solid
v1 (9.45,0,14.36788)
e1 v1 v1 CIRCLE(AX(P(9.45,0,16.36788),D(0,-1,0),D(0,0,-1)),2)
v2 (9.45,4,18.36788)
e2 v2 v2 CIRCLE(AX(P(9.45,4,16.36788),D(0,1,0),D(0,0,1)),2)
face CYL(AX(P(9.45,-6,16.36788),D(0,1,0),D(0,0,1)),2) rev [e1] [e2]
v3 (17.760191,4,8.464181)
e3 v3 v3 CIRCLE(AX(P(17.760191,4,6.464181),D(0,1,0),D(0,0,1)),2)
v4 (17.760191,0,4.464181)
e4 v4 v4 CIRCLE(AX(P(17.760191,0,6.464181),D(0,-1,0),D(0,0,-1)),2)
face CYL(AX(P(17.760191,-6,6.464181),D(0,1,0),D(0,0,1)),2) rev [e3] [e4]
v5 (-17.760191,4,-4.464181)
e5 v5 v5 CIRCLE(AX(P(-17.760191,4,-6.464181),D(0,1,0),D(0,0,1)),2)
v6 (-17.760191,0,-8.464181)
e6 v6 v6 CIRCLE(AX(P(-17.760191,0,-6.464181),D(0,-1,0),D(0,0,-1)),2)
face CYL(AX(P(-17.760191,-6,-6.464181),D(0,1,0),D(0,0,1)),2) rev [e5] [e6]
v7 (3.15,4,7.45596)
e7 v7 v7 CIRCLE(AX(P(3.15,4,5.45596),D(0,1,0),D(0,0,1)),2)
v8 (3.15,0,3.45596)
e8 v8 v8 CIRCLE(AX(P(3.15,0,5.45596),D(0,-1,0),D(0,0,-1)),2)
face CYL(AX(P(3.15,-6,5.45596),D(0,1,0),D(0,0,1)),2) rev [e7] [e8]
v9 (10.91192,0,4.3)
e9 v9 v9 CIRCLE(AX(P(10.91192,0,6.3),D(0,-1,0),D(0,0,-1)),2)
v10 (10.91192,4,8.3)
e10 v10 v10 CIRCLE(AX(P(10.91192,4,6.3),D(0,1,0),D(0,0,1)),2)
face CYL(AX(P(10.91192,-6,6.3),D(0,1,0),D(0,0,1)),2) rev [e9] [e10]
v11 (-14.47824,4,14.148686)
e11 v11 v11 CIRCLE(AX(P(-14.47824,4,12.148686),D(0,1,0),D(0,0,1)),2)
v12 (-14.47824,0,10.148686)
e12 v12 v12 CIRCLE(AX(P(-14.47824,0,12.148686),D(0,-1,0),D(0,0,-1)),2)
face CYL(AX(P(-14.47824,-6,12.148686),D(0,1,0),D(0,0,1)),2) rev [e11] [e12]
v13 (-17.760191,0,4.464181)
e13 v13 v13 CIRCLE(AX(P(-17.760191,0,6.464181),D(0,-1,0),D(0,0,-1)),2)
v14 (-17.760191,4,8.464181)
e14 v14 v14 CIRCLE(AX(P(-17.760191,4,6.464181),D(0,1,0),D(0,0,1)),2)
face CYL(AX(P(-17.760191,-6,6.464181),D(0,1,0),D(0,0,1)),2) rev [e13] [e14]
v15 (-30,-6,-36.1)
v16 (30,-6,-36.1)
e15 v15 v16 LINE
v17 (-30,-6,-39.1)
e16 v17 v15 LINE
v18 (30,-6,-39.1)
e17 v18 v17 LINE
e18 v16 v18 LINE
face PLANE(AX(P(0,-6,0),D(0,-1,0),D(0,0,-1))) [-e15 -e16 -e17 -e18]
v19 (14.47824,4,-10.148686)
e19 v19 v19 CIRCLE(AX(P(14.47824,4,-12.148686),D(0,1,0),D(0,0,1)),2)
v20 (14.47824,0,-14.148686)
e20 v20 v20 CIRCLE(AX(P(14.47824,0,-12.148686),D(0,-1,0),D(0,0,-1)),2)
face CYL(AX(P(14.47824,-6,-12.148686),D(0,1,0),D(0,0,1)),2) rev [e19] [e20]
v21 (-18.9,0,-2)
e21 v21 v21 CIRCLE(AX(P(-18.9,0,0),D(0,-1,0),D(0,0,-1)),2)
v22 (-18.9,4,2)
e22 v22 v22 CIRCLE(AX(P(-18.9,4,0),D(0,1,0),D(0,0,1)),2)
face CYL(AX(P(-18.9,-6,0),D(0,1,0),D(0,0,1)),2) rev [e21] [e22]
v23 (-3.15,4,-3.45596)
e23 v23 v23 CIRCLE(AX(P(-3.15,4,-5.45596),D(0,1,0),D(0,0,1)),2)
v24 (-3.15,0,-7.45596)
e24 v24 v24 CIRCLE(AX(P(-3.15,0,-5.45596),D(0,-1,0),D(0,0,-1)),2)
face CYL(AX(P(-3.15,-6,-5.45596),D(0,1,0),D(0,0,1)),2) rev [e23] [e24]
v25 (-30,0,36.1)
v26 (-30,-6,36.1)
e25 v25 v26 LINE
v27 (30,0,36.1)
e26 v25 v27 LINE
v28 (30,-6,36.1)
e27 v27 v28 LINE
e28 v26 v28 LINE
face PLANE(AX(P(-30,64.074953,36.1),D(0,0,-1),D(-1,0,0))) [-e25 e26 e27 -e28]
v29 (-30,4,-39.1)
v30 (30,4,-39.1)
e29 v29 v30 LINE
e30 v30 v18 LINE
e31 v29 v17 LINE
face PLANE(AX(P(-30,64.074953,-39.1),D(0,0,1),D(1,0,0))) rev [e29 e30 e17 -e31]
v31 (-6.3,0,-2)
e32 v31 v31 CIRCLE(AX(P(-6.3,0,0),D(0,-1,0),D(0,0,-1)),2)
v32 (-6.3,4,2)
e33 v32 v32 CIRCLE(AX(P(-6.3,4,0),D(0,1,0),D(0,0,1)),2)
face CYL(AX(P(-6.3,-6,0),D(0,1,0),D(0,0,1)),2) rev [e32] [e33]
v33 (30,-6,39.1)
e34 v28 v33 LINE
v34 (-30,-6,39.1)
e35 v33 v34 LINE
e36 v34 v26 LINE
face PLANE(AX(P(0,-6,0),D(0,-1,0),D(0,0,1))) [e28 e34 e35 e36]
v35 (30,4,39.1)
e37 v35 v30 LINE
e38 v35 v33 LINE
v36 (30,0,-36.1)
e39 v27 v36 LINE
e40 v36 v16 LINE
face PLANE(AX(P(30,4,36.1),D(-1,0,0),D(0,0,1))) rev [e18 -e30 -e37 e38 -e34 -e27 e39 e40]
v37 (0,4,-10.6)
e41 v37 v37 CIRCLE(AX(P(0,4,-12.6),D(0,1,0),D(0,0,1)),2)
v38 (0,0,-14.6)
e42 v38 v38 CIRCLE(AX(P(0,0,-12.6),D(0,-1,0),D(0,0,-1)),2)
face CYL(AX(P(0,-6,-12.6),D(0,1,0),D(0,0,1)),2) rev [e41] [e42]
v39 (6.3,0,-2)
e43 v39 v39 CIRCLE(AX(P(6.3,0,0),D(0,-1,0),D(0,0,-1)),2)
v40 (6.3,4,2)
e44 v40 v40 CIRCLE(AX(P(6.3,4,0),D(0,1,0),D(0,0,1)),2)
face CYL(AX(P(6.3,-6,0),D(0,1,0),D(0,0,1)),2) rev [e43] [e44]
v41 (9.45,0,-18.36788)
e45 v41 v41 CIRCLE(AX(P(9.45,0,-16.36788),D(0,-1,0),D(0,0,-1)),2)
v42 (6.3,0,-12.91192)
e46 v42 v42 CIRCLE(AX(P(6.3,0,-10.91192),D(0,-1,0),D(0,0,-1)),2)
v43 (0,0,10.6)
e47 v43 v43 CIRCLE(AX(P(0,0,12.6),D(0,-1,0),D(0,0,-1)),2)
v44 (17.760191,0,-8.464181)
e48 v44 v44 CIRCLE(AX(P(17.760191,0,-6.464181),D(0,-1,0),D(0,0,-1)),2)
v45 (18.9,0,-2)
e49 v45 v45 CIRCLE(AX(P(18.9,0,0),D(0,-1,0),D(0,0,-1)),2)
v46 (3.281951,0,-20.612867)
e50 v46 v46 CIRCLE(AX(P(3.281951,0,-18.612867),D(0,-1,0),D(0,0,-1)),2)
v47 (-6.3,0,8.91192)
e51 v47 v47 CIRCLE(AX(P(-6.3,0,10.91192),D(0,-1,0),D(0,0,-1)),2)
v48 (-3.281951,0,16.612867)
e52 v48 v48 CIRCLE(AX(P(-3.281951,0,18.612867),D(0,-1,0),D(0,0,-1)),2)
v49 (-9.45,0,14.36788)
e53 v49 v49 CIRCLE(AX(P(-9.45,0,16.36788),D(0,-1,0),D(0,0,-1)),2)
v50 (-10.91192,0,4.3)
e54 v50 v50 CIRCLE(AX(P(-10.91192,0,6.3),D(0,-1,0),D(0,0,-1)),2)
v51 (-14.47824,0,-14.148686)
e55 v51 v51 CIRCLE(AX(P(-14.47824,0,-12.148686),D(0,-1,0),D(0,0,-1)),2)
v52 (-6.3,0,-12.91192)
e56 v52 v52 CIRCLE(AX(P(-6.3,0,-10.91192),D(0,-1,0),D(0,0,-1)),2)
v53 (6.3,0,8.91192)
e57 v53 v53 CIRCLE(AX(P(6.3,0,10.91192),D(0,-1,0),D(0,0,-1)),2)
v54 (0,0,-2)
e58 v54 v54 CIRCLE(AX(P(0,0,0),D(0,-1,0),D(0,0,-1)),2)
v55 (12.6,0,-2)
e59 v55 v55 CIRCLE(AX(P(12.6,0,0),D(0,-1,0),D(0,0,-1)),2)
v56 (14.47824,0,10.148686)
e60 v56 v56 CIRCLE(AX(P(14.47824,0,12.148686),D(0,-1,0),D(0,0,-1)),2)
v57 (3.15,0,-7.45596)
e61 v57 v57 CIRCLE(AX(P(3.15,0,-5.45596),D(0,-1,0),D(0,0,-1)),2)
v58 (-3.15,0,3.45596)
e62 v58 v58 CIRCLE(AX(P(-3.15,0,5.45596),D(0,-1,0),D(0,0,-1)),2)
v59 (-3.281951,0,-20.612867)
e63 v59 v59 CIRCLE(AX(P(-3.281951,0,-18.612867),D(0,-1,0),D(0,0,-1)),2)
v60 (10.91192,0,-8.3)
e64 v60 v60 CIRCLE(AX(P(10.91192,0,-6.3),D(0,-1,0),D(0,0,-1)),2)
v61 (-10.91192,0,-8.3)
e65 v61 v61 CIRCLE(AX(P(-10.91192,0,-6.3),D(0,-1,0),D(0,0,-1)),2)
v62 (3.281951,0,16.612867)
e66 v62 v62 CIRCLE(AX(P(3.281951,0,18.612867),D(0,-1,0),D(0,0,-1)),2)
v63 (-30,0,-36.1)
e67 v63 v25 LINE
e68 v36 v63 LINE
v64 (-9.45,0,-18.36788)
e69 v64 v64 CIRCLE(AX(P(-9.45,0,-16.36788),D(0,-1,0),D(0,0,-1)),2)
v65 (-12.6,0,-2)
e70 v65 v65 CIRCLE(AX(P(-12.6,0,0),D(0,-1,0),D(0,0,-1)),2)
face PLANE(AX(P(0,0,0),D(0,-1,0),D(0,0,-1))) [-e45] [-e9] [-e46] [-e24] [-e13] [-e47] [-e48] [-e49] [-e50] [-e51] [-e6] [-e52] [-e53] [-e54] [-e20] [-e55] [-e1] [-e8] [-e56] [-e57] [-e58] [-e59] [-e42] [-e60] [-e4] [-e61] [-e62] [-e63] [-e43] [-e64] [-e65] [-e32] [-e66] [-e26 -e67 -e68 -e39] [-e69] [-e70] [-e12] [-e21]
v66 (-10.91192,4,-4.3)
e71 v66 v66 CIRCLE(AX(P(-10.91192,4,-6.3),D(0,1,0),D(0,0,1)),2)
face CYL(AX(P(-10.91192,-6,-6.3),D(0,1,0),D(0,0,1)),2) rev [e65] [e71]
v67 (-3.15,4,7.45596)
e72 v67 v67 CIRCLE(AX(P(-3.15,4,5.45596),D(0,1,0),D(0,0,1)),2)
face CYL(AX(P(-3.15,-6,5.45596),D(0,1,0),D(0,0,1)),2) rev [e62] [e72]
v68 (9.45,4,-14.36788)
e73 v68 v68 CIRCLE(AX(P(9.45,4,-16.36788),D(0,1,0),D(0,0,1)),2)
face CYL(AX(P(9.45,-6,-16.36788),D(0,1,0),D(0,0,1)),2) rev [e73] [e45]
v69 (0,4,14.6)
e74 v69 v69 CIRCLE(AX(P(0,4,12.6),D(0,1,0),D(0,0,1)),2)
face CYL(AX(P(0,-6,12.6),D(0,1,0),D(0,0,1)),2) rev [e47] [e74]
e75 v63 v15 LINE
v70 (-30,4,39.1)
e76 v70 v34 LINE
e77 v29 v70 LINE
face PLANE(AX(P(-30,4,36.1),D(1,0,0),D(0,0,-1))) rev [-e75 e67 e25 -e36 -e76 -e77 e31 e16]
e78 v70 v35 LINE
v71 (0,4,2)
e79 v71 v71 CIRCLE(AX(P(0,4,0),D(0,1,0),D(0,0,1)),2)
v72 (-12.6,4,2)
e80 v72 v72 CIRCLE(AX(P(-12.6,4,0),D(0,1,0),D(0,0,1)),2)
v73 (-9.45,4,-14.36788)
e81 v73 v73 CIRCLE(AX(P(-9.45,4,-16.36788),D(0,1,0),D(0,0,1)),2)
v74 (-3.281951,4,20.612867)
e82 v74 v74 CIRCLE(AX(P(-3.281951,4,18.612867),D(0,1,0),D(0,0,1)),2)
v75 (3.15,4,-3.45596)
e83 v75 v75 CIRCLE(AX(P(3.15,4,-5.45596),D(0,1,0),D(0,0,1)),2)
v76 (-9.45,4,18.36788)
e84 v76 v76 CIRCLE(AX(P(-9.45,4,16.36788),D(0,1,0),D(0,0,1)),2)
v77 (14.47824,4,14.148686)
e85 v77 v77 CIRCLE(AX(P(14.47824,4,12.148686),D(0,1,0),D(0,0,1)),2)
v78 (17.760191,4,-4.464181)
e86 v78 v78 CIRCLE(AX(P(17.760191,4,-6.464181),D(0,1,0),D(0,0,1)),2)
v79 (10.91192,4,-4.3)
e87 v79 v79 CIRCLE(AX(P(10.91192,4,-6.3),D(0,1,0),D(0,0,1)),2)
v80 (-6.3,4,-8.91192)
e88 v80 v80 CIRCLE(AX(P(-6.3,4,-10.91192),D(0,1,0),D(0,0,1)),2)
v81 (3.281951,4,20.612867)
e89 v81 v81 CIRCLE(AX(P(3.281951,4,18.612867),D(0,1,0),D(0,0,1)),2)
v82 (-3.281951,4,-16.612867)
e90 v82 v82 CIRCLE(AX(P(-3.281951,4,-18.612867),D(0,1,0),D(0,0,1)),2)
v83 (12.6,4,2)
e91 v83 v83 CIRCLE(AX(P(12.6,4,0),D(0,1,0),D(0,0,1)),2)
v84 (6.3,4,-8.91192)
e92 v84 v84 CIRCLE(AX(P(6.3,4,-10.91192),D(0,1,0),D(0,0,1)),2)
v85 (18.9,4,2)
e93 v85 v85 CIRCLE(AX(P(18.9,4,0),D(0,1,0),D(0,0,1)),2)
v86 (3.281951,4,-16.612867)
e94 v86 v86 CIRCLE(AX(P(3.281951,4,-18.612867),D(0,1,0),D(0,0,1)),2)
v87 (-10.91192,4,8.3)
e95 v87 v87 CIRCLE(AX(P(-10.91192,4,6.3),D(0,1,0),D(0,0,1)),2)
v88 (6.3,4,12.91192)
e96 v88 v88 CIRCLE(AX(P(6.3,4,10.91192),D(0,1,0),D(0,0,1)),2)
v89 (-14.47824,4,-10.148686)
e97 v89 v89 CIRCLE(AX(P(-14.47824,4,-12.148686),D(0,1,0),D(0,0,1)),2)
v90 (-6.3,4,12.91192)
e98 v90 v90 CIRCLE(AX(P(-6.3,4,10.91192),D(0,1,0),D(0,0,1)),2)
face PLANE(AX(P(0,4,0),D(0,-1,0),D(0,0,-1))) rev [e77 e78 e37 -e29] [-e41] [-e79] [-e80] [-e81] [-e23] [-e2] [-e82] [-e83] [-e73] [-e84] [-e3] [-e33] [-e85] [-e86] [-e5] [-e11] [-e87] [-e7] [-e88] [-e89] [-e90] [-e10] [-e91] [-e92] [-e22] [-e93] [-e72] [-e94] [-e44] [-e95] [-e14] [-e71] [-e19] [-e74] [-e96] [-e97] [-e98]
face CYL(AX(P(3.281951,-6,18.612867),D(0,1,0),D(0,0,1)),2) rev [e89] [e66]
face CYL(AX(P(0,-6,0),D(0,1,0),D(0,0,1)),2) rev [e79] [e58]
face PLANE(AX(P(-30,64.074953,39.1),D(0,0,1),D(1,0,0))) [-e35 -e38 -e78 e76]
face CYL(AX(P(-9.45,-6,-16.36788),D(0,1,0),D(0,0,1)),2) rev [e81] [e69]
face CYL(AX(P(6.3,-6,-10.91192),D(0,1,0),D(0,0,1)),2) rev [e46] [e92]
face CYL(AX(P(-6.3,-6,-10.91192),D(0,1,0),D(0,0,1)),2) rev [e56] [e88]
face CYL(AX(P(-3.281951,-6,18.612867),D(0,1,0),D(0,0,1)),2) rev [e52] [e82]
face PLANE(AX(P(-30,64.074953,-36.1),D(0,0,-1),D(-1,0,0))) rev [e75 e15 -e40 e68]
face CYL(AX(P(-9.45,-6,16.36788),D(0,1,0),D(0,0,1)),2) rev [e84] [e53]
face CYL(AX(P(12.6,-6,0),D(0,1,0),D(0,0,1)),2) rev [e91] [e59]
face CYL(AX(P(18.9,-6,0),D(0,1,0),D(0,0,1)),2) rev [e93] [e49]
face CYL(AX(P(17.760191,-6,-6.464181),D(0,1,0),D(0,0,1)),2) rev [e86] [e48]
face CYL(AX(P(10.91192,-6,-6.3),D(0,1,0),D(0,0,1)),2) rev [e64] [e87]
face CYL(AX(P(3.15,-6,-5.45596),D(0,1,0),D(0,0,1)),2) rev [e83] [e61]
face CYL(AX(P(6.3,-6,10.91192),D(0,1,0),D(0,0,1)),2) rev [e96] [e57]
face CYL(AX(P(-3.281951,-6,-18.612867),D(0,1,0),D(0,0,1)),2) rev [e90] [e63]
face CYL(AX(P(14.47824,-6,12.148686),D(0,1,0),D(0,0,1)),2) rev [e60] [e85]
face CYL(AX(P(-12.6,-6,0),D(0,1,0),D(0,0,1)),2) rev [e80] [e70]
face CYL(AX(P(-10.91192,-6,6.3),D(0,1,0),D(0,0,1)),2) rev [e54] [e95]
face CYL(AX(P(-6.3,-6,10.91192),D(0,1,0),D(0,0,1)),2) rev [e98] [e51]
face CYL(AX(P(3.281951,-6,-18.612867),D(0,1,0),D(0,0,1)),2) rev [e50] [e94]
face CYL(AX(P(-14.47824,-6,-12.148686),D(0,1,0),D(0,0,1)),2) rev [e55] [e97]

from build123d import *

# Parameters (mm, degrees)
SKIZZE1_W                       = 60
SKIZZE1_H                       = 72.2
AUFSATZ_LINEAR_AUSTRAGEN1_DEPTH = 4
AUFSATZ_LINEAR_START            = -6
SKIZZE2_W                       = 60
SKIZZE2_H                       = 3
AUFSATZ_LINEAR_AUSTRAGEN2_DEPTH = 10
SKIZZE4_R                       = 2
SCHNITT_LINEAR_AUSTRAGEN1_DEPTH = 51.287274732
F_LLMUSTER1_OUTLINE_R           = 2
F_LLMUSTER1_DEPTH               = 4


# Read off the part's stored shape, not the designer's step: Füllmuster1
with BuildPart() as part:
    # Skizze1 → Aufsatz-Linear austragen1 (new body)
    with BuildSketch(Plane(origin=(0, 0, 0), x_dir=(1, 0, 0), z_dir=(0, 1, 0))):
        Rectangle(SKIZZE1_W, SKIZZE1_H)
    extrude(amount=AUFSATZ_LINEAR_AUSTRAGEN1_DEPTH)

    # Skizze2 → Aufsatz-Linear austragen2 (add)
    with BuildSketch(Plane(origin=(0, 0, 0), x_dir=(1, 0, 0), z_dir=(0, 1, 0)).offset(AUFSATZ_LINEAR_START)):
        with Locations((0, 37.6)):
            Rectangle(SKIZZE2_W, SKIZZE2_H)
    aufsatz_linear_austragen2 = extrude(amount=AUFSATZ_LINEAR_AUSTRAGEN2_DEPTH)

    # Spiegeln1: Aufsatz-Linear austragen2 across plane
    add(aufsatz_linear_austragen2.mirror(Plane.XY))

    # Skizze4 → Schnitt-Linear austragen1 (cut, through all)
    with BuildSketch(Plane(origin=(0, 4, 0), x_dir=(1, 0, 0), z_dir=(0, 1, 0))):
        with Locations(Location((0, 0, 0), (0, 0, 270))):
            Circle(SKIZZE4_R)
    extrude(amount=-SCHNITT_LINEAR_AUSTRAGEN1_DEPTH, mode=Mode.SUBTRACT)

    # Füllmuster1 outline → Füllmuster1 (cut)
    with BuildSketch(Plane(origin=(0, 0, 0), x_dir=(1, 0, 0), z_dir=(0, 1, 0))):
        with Locations((6.3, 0)):
            Circle(F_LLMUSTER1_OUTLINE_R)
        with Locations((17.760190533, 6.464180709)):
            Circle(F_LLMUSTER1_OUTLINE_R)
        with Locations((14.478239975, 12.148685823)):
            Circle(F_LLMUSTER1_OUTLINE_R)
        with Locations((9.45, 16.367880132)):
            Circle(F_LLMUSTER1_OUTLINE_R)
        with Locations((6.3, 10.911920088)):
            Circle(F_LLMUSTER1_OUTLINE_R)
        with Locations((0, 12.6)):
            Circle(F_LLMUSTER1_OUTLINE_R)
        with Locations((-6.3, 10.911920088)):
            Circle(F_LLMUSTER1_OUTLINE_R)
        with Locations((-10.911920088, 6.3)):
            Circle(F_LLMUSTER1_OUTLINE_R)
        with Locations((-12.6, 0)):
            Circle(F_LLMUSTER1_OUTLINE_R)
        with Locations((-10.911920088, -6.3)):
            Circle(F_LLMUSTER1_OUTLINE_R)
        with Locations((-6.3, -10.911920088)):
            Circle(F_LLMUSTER1_OUTLINE_R)
        with Locations((0, -12.6)):
            Circle(F_LLMUSTER1_OUTLINE_R)
        with Locations((3.15, -5.455960044)):
            Circle(F_LLMUSTER1_OUTLINE_R)
        with Locations((-3.15, -5.455960044)):
            Circle(F_LLMUSTER1_OUTLINE_R)
        with Locations((-6.3, 0)):
            Circle(F_LLMUSTER1_OUTLINE_R)
        with Locations((-3.15, 5.455960044)):
            Circle(F_LLMUSTER1_OUTLINE_R)
        with Locations((3.15, 5.455960044)):
            Circle(F_LLMUSTER1_OUTLINE_R)
        with Locations((12.6, 0)):
            Circle(F_LLMUSTER1_OUTLINE_R)
        with Locations((10.911920088, -6.3)):
            Circle(F_LLMUSTER1_OUTLINE_R)
        with Locations((6.3, -10.911920088)):
            Circle(F_LLMUSTER1_OUTLINE_R)
        with Locations((3.281950558, 18.612866532)):
            Circle(F_LLMUSTER1_OUTLINE_R)
        with Locations((-3.281950558, 18.612866532)):
            Circle(F_LLMUSTER1_OUTLINE_R)
        with Locations((-9.45, 16.367880132)):
            Circle(F_LLMUSTER1_OUTLINE_R)
        with Locations((-14.478239975, 12.148685823)):
            Circle(F_LLMUSTER1_OUTLINE_R)
        with Locations((-17.760190533, 6.464180709)):
            Circle(F_LLMUSTER1_OUTLINE_R)
        with Locations((-18.9, 0)):
            Circle(F_LLMUSTER1_OUTLINE_R)
        with Locations((-17.760190533, -6.464180709)):
            Circle(F_LLMUSTER1_OUTLINE_R)
        with Locations((-14.478239975, -12.148685823)):
            Circle(F_LLMUSTER1_OUTLINE_R)
        with Locations((-9.45, -16.367880132)):
            Circle(F_LLMUSTER1_OUTLINE_R)
        with Locations((-3.281950558, -18.612866532)):
            Circle(F_LLMUSTER1_OUTLINE_R)
        with Locations((3.281950558, -18.612866532)):
            Circle(F_LLMUSTER1_OUTLINE_R)
        with Locations((9.45, -16.367880132)):
            Circle(F_LLMUSTER1_OUTLINE_R)
        with Locations((14.478239975, -12.148685823)):
            Circle(F_LLMUSTER1_OUTLINE_R)
        with Locations((17.760190533, -6.464180709)):
            Circle(F_LLMUSTER1_OUTLINE_R)
        with Locations((18.9, 0)):
            Circle(F_LLMUSTER1_OUTLINE_R)
        with Locations((10.911920088, 6.3)):
            Circle(F_LLMUSTER1_OUTLINE_R)
    extrude(amount=F_LLMUSTER1_DEPTH, mode=Mode.SUBTRACT)


solid = part.part
